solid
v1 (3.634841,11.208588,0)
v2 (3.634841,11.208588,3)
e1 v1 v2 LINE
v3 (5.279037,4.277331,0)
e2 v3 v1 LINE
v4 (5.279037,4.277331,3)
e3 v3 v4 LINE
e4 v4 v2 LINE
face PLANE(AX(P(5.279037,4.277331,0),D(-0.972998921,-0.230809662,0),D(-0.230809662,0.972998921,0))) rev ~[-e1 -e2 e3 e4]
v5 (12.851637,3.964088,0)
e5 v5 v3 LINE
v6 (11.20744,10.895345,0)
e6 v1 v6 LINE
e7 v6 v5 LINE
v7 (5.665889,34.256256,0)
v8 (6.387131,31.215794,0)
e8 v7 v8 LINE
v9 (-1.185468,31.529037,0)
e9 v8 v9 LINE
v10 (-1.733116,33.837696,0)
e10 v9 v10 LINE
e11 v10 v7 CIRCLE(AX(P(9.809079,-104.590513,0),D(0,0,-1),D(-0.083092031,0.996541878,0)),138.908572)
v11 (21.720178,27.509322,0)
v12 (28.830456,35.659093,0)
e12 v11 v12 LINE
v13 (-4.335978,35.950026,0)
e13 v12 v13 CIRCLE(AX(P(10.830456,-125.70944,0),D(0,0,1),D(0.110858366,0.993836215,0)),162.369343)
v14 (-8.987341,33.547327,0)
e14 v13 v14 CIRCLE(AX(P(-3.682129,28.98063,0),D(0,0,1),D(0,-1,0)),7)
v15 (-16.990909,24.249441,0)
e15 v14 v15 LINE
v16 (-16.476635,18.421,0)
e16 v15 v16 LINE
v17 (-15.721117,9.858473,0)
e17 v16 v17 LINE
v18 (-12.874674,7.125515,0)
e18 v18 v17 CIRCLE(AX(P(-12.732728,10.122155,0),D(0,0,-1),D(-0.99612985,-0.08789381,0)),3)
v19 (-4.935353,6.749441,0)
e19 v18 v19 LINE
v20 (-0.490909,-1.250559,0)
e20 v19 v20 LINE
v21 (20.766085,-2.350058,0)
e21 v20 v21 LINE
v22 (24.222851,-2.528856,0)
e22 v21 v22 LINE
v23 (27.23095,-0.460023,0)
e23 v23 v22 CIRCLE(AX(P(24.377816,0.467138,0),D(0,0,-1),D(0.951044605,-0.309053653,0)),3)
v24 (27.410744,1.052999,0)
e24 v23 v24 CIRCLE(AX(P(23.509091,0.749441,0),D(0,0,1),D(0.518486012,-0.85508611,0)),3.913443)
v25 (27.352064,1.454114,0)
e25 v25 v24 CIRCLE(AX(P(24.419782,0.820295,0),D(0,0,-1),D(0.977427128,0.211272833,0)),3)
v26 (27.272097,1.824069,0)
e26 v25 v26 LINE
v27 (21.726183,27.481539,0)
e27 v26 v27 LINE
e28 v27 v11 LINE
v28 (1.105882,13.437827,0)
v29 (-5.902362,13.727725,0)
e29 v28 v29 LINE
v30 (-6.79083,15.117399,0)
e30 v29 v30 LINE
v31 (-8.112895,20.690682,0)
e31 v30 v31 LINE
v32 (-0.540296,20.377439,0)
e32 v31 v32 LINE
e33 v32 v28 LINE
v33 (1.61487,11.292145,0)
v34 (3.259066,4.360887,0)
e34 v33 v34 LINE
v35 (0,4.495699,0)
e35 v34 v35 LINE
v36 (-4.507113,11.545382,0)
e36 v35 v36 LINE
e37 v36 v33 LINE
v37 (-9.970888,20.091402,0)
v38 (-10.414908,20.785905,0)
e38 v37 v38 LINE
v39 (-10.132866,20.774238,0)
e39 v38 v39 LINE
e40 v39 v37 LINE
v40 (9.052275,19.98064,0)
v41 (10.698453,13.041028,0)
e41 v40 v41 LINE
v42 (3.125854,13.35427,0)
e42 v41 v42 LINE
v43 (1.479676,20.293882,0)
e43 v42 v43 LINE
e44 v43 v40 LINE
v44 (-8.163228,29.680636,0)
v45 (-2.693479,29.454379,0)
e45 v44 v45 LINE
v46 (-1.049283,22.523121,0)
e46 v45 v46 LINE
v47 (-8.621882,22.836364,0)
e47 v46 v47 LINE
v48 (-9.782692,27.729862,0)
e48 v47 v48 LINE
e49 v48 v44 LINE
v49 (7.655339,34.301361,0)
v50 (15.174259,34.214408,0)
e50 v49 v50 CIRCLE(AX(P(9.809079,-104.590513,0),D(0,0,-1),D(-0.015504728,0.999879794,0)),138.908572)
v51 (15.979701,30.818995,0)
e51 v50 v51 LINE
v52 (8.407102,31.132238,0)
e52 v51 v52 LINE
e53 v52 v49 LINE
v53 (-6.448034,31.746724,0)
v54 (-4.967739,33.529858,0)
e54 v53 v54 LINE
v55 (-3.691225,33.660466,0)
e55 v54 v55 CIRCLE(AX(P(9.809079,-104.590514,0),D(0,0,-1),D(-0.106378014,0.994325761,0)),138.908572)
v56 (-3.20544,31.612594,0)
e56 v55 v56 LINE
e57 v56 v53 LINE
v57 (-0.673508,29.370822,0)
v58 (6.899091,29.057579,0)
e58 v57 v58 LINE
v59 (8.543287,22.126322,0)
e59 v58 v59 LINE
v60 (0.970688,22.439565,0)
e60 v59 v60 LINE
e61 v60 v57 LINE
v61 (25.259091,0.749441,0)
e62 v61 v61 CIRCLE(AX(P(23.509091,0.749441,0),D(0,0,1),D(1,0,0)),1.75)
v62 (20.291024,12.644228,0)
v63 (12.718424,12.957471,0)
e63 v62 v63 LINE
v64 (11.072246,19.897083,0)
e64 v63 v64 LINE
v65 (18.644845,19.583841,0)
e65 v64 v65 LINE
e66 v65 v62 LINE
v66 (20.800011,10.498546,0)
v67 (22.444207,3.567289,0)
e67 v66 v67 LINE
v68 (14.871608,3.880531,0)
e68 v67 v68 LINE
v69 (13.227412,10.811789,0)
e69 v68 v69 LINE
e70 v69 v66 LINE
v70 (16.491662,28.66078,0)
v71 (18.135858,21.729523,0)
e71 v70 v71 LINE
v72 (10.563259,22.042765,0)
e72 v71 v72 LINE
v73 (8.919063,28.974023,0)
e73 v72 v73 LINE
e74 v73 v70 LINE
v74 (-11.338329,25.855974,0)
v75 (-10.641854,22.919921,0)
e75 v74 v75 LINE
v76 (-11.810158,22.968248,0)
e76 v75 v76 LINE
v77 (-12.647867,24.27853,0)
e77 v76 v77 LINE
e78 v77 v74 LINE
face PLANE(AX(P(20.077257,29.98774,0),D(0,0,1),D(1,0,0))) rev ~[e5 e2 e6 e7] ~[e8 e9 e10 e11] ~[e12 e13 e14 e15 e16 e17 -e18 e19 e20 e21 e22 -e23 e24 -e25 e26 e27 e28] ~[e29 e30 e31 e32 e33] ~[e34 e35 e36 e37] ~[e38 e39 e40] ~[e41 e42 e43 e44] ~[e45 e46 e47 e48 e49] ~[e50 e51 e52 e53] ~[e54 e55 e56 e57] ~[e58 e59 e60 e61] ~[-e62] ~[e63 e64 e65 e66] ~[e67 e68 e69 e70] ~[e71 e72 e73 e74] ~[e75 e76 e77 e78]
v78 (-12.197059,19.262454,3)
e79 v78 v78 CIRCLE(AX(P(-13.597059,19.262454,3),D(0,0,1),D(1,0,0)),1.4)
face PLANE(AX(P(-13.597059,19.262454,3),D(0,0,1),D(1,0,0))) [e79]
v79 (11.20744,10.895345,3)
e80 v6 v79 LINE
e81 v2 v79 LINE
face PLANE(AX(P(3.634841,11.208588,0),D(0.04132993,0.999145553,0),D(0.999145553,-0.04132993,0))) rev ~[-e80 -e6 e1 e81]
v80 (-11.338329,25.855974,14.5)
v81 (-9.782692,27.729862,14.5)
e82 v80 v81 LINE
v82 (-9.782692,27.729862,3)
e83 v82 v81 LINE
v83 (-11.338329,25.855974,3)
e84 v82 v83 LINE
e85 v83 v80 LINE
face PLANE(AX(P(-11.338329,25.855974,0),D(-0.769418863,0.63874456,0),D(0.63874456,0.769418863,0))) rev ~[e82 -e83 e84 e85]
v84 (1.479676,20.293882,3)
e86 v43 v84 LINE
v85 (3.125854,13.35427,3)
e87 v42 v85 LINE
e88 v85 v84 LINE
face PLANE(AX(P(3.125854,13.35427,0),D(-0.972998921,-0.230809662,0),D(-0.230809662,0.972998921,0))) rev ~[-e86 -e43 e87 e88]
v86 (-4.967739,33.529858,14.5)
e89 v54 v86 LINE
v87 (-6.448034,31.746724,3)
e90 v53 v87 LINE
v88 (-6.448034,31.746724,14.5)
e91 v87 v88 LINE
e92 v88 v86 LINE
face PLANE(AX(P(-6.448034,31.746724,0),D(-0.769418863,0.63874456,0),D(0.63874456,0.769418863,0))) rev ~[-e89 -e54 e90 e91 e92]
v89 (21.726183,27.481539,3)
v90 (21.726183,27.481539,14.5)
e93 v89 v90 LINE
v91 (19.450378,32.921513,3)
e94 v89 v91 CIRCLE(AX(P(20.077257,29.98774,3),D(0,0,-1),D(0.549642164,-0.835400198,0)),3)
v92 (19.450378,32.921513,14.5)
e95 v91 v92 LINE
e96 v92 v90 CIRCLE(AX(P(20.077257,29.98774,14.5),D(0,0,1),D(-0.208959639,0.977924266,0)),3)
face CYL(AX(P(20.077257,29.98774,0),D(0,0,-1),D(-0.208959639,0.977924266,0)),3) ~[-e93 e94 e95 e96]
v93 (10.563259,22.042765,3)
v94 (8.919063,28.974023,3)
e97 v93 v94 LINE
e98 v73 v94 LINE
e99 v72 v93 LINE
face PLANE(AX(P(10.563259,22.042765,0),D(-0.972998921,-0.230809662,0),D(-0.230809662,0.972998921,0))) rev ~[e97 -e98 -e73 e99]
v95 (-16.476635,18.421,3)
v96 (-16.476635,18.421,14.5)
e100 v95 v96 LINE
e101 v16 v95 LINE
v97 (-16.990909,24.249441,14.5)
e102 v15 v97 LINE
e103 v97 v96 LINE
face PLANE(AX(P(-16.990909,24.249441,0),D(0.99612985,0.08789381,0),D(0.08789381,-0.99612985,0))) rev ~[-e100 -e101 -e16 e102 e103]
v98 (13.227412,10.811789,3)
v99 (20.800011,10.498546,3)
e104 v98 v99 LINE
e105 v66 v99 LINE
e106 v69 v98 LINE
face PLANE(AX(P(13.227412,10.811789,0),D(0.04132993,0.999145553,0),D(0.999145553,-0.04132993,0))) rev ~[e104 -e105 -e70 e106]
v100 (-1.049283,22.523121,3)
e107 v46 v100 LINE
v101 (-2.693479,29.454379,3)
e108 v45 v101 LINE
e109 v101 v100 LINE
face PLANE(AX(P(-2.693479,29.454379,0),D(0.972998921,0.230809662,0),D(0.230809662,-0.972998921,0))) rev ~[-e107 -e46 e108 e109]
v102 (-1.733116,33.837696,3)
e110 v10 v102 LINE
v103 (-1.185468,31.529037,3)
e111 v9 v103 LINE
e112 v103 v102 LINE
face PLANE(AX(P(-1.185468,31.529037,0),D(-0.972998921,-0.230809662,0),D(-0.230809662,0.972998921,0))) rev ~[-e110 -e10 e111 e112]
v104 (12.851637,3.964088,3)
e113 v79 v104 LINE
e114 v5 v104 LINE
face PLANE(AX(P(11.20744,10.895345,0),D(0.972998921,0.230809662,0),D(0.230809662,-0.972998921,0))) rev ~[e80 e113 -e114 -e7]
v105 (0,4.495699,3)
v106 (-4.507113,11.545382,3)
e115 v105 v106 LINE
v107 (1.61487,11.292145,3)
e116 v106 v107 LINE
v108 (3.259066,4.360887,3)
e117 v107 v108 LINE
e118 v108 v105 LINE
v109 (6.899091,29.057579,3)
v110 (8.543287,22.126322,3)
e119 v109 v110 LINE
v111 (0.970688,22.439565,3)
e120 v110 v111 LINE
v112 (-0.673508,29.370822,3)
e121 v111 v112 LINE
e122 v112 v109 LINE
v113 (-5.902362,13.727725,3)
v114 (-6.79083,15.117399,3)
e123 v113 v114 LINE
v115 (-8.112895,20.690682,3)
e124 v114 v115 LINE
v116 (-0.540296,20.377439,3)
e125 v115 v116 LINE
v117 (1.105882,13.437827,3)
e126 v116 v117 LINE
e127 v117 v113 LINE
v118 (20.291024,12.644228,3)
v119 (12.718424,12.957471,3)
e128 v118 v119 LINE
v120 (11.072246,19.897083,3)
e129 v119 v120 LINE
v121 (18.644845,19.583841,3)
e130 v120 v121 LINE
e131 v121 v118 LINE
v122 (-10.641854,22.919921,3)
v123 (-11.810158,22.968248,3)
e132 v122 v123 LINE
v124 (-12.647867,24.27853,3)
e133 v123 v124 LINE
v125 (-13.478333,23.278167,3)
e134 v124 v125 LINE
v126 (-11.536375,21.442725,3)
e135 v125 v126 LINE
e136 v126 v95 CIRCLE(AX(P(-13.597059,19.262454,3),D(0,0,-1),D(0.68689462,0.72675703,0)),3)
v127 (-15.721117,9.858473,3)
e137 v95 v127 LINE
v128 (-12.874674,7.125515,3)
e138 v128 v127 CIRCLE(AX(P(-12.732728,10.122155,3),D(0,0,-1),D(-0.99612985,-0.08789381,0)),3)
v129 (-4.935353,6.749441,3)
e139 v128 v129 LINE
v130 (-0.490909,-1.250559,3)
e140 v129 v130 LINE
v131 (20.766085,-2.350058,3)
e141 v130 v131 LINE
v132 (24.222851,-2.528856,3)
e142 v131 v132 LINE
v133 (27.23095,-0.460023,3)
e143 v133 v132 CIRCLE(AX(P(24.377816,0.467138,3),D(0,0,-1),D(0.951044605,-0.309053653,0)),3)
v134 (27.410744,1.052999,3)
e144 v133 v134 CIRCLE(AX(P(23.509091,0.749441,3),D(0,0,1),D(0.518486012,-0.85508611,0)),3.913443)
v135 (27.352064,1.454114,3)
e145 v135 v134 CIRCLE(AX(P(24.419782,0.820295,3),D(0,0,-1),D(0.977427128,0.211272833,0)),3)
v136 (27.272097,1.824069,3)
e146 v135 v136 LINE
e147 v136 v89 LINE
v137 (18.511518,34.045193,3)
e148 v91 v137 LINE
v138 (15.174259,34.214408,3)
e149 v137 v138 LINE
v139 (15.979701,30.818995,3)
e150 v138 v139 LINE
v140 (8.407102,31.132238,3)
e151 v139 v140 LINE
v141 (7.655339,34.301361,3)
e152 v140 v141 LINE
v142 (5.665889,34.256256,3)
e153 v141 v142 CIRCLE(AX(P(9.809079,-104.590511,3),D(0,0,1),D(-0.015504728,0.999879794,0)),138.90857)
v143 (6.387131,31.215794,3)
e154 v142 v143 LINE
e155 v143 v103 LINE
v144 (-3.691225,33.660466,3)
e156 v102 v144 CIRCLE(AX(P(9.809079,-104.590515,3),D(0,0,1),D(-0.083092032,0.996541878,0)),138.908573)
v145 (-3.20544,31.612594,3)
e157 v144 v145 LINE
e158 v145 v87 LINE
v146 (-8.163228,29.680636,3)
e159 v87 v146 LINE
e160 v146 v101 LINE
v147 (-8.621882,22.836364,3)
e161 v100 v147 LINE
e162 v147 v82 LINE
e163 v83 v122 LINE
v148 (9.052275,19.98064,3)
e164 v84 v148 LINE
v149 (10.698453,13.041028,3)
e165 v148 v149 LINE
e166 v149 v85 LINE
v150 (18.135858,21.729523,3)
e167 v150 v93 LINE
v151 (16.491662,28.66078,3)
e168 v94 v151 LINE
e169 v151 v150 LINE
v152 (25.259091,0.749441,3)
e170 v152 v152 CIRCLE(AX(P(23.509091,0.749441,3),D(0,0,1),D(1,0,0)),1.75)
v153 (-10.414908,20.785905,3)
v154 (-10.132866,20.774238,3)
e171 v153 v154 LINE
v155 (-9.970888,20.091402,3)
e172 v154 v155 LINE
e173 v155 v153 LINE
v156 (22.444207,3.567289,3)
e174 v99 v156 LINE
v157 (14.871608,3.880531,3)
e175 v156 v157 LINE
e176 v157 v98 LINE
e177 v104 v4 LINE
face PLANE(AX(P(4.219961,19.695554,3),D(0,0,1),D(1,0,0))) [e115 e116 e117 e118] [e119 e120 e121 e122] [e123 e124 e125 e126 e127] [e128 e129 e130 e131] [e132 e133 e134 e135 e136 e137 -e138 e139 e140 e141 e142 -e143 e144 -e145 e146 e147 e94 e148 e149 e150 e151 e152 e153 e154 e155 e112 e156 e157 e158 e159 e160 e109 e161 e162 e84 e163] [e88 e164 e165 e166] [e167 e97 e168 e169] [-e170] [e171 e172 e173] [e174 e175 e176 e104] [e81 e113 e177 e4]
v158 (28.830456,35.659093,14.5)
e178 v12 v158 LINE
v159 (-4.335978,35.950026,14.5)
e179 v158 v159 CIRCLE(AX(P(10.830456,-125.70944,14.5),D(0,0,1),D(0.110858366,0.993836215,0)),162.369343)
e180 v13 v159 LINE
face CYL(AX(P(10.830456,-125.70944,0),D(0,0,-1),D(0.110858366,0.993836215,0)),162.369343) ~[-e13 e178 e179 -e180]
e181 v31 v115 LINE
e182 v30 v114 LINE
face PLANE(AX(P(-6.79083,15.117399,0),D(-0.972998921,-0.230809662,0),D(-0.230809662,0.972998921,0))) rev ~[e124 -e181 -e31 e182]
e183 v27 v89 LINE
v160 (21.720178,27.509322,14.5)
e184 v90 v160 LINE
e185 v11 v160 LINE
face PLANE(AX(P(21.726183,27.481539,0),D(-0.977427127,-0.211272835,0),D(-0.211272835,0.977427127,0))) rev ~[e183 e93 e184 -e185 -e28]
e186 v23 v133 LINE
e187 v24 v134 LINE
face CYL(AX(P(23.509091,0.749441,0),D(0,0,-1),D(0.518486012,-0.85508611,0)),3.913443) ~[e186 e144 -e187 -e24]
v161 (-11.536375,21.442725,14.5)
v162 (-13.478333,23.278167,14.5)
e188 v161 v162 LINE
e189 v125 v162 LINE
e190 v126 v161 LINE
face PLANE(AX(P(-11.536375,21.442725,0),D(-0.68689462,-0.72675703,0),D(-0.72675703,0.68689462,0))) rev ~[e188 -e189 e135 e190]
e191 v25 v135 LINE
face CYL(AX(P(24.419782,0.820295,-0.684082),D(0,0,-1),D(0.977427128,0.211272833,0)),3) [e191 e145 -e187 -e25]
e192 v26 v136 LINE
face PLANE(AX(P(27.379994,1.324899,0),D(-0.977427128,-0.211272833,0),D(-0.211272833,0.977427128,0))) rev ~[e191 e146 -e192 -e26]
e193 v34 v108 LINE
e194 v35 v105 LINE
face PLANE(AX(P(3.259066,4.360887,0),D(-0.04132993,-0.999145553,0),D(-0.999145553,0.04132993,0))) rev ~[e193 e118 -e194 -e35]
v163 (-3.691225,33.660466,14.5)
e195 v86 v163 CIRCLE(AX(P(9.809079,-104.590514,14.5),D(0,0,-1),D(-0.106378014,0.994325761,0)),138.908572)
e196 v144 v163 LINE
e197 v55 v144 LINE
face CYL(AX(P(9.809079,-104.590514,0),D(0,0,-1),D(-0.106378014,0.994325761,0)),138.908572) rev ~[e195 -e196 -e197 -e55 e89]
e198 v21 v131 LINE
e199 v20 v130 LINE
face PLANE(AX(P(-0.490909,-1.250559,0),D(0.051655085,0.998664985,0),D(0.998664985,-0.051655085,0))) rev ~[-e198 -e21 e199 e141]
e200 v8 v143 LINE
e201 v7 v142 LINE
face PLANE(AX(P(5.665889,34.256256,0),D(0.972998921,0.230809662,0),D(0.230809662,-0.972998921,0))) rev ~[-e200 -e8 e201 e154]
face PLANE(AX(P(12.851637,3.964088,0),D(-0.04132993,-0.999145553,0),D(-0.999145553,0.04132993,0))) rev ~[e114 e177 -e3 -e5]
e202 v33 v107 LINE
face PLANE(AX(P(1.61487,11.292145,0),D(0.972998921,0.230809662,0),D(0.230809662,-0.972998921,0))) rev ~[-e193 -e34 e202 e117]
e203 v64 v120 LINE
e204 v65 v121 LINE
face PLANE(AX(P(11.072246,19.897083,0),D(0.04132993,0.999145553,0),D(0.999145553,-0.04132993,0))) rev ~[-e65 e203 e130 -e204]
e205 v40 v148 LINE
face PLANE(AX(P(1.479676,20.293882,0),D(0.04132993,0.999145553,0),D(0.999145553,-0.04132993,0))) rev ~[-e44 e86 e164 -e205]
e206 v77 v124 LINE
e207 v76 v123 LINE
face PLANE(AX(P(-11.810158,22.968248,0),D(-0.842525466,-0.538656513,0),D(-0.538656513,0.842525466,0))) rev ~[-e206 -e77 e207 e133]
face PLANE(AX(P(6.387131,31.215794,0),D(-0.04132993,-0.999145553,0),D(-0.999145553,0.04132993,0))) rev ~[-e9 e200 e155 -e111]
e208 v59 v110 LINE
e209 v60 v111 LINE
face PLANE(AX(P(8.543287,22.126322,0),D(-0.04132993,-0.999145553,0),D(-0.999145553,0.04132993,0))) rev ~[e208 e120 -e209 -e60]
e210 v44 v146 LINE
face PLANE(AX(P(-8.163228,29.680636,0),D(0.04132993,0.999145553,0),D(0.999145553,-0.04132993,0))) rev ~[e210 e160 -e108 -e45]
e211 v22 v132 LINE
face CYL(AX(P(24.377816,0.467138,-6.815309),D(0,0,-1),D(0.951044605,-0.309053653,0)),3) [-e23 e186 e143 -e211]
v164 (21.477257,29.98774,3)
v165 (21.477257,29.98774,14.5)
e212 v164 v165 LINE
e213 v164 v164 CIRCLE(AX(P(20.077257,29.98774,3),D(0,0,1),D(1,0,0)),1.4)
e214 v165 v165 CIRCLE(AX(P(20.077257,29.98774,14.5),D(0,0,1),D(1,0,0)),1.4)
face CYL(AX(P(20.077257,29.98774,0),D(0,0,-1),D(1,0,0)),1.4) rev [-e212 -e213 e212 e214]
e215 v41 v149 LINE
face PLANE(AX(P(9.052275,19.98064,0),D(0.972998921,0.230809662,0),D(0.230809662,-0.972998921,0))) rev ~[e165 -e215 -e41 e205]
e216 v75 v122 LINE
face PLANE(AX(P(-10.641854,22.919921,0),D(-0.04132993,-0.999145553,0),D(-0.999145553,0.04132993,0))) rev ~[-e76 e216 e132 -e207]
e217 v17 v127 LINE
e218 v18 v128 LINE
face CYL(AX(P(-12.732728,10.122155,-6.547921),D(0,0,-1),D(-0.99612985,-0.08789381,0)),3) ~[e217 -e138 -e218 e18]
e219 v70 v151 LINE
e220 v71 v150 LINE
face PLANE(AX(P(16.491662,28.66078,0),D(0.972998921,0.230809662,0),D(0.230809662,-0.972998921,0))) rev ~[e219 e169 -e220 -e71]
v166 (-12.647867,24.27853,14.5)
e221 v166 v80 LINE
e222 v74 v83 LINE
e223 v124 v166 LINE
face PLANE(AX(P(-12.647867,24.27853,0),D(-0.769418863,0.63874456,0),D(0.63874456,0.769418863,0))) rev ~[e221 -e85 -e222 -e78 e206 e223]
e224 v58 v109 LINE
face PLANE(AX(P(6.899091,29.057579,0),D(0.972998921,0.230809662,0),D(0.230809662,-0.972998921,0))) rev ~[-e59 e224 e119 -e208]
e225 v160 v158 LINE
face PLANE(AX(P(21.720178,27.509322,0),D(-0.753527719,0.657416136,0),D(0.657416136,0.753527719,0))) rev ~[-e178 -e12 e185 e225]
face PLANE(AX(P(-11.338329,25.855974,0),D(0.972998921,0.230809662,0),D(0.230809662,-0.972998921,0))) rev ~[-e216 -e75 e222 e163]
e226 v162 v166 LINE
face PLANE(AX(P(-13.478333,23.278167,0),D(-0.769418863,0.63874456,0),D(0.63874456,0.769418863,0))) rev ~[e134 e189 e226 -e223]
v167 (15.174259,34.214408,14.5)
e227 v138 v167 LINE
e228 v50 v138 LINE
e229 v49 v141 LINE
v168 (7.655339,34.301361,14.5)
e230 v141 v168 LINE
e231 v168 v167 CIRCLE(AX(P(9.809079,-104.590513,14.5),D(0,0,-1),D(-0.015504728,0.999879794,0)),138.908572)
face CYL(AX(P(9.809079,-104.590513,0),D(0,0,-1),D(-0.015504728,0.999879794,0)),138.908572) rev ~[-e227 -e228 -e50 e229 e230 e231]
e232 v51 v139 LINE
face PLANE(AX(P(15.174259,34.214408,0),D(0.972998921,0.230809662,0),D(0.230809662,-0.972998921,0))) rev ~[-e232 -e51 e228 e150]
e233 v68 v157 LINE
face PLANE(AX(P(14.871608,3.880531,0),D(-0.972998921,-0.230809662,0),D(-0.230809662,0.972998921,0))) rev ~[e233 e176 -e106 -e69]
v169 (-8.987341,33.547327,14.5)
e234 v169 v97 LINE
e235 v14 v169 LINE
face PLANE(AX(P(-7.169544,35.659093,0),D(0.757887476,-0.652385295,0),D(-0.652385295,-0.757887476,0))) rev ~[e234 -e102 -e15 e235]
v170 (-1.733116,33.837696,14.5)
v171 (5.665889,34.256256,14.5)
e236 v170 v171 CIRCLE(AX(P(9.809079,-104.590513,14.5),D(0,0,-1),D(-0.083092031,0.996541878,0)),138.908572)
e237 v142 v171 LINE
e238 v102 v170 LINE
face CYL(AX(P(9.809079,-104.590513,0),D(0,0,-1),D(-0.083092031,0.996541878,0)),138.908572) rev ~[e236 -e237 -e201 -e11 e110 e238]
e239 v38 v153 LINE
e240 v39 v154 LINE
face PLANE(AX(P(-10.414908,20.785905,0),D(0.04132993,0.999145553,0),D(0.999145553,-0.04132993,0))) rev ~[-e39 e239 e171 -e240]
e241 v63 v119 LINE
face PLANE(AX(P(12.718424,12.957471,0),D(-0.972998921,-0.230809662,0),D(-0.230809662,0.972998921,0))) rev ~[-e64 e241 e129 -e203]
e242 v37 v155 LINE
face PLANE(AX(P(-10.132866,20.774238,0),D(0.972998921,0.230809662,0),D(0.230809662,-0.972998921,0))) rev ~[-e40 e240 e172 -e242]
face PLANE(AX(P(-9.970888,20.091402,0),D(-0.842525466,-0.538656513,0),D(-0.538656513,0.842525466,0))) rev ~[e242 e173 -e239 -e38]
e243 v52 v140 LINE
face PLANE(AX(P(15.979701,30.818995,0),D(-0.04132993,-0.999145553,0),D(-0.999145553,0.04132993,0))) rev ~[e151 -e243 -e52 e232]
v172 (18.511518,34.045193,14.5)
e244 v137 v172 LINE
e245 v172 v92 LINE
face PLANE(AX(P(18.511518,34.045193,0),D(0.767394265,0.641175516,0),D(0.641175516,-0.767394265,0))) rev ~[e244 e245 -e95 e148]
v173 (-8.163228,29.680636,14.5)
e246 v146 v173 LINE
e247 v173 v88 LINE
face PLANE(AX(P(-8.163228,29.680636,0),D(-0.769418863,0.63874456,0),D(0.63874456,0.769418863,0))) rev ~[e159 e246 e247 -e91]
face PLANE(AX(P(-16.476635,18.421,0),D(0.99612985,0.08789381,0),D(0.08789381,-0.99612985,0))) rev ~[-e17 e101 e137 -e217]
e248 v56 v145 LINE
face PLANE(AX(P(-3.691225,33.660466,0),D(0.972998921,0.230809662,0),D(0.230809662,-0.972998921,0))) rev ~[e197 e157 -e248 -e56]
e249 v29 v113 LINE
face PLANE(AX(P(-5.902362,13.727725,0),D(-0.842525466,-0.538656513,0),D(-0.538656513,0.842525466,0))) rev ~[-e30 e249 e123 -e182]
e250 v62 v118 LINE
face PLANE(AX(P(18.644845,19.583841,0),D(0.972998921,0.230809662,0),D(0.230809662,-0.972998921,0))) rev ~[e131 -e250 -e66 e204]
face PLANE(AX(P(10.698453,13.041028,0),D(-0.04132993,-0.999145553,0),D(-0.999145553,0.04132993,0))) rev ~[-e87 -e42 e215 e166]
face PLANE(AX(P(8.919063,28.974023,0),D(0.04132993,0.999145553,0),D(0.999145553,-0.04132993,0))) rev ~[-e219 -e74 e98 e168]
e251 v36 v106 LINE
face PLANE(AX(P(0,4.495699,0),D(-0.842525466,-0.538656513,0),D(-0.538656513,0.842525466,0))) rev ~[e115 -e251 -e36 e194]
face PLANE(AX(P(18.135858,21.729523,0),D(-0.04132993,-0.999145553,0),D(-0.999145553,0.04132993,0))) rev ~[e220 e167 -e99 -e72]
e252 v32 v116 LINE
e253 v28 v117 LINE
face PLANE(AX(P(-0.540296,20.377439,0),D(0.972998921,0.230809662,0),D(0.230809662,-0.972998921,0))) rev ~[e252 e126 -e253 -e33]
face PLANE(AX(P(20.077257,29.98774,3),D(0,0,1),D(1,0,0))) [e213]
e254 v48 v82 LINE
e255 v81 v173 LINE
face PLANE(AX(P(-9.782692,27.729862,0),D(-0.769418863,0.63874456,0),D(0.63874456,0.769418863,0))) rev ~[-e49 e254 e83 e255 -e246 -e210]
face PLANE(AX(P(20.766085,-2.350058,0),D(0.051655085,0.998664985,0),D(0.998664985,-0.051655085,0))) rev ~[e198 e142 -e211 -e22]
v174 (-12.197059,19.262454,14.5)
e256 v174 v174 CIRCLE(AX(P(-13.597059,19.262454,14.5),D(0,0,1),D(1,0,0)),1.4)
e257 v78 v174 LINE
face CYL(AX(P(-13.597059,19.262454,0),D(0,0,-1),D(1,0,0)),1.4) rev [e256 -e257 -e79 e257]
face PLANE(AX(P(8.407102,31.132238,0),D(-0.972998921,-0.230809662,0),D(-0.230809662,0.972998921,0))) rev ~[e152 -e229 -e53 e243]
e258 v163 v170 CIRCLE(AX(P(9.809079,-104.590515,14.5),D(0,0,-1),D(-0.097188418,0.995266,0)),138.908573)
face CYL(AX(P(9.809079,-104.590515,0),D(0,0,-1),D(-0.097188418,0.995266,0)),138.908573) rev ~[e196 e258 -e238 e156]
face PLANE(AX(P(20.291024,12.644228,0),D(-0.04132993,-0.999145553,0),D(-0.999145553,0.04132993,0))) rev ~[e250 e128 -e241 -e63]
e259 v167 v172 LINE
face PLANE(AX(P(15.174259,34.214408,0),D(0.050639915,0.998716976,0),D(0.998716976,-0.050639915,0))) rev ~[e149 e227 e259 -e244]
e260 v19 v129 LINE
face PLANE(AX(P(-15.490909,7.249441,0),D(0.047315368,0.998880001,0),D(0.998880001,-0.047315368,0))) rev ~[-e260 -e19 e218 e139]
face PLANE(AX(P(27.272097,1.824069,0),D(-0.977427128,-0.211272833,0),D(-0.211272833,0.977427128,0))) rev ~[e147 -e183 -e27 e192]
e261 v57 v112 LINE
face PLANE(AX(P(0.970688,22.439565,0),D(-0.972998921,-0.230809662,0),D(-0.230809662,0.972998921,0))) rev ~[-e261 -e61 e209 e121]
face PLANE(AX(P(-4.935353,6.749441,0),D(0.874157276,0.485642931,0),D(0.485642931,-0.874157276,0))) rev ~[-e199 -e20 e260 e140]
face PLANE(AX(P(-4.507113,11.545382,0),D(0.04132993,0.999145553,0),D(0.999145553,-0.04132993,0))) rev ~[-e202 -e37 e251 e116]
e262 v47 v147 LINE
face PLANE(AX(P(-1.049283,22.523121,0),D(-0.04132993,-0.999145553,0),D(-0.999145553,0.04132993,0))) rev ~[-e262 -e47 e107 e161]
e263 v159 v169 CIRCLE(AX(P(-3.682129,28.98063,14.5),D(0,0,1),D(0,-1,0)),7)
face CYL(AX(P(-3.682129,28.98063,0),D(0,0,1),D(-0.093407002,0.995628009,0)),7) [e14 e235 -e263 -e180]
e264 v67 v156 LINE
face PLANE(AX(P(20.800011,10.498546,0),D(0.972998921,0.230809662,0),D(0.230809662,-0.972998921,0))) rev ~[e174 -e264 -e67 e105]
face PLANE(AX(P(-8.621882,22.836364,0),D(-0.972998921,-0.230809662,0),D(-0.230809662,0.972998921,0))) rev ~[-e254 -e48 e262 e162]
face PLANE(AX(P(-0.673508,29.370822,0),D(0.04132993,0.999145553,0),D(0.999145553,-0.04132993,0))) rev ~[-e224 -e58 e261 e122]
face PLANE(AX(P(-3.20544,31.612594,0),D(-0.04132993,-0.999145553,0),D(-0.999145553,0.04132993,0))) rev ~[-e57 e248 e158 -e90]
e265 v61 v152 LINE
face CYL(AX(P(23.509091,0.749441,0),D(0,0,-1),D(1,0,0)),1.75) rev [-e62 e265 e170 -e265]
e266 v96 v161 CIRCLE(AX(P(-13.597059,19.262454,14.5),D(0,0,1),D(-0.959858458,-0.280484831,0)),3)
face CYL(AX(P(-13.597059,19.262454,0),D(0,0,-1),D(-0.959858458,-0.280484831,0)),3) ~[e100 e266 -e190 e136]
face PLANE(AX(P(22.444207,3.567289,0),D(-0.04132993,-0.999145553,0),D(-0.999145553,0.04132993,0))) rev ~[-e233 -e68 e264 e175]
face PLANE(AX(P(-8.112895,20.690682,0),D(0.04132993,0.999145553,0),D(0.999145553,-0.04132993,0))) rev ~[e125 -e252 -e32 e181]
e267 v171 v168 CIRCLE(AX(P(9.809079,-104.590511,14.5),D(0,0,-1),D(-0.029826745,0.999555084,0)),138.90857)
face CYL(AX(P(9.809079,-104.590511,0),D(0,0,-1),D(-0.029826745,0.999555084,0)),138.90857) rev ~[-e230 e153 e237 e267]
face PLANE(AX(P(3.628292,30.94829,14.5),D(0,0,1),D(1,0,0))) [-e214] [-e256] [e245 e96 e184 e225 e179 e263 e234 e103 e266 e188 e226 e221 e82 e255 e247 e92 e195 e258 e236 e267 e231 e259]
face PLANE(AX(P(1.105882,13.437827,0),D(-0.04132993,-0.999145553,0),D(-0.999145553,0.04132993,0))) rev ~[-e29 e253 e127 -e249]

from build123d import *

# Parameters (mm, degrees)
F0_R        = 1.75
F1_DEPTH    = 3
F0_R_2      = 1.4
F2_DEPTH    = 14.5
F3_DEPTH    = 3
F4_R        = 7
F5_T1_DEPTH = 16.6306186867
F5_T3_DEPTH = 4.3681636199
F5_T5_DEPTH = 16.0958411758
F7_DEPTH    = 3


# Not quite as in the source:
# - a fillet or chamfer that OpenCascade refuses, or shapes differently, is made with other operations: its cross-section is extruded or revolved along the edge and cut away or added
# - two fillets or chamfers of one size are made in one step


with BuildPart() as f1:
    # F0 (on Top) → F1 (new body)
    with BuildSketch(Plane.XY):
        with BuildLine():
            Line((-0.4909088138, -1.2505585665), (20.7660850672, -2.35005825))
            Line((20.7660850672, -2.35005825), (25.5381567791, -2.5968895454))
            ThreePointArc((25.5381567791, -2.5968895454), (27.0513379129, -0.9141469555), (27.3799938245, 1.3248986134))
            Line((27.3799938245, 1.3248986134), (27.2720971653, 1.8240689049))
            Line((27.2720971653, 1.8240689049), (21.7261834625, 27.4815394929))
            ThreePointArc((21.7261834625, 27.4815394929), (17.3096816882, 28.8299287619), (19.4503780507, 32.9215128838))
            Line((19.4503780507, 32.9215128838), (18.5115177807, 34.0451927012))
            Line((18.5115177807, 34.0451927012), (15.1742594532, 34.2144082882))
            Line((15.1742594532, 34.2144082882), (15.9797014768, 30.8189948872))
            Line((15.9797014768, 30.8189948872), (16.4916617939, 28.6607800556))
            Line((16.4916617939, 28.6607800556), (18.135858017, 21.7295227758))
            Line((18.135858017, 21.7295227758), (18.644845427, 19.5838405017))
            Line((18.644845427, 19.5838405017), (20.2910235881, 12.6442281836))
            Line((20.2910235881, 12.6442281836), (20.8000109982, 10.4985459094))
            Line((20.8000109982, 10.4985459094), (22.4442072213, 3.5672886297))
            Line((22.4442072213, 3.5672886297), (14.8716080252, 3.8805312748))
            Line((14.8716080252, 3.8805312748), (12.8516365903, 3.9640879479))
            Line((12.8516365903, 3.9640879479), (5.2790373942, 4.2773305929))
            Line((5.2790373942, 4.2773305929), (3.2590659592, 4.360887266))
            Line((3.2590659592, 4.360887266), (0, 4.4956994243))
            Line((0, 4.4956994243), (-4.5071129665, 11.5453820412))
            Line((-4.5071129665, 11.5453820412), (-5.9023623433, 13.727724785))
            Line((-5.9023623433, 13.727724785), (-6.7908302355, 15.1173985523))
            Line((-6.7908302355, 15.1173985523), (-9.9708875905, 20.0914019161))
            Line((-9.9708875905, 20.0914019161), (-10.4149082493, 20.7859051919))
            Line((-10.4149082493, 20.7859051919), (-11.8101576261, 22.9682479357))
            Line((-11.8101576261, 22.9682479357), (-12.6478674294, 24.2785297685))
            Line((-12.6478674294, 24.2785297685), (-13.4783331305, 23.2781674713))
            Line((-13.4783331305, 23.2781674713), (-11.5363753254, 21.4427254814))
            ThreePointArc((-11.5363753254, 21.4427254814), (-12.0316990994, 16.7032264224), (-16.4766345607, 18.4209998989))
            Line((-16.4766345607, 18.4209998989), (-15.4909088138, 7.2494414335))
            Line((-15.4909088138, 7.2494414335), (-4.9353532582, 6.7494414335))
            Line((-4.9353532582, 6.7494414335), (-0.4909088138, -1.2505585665))
        make_face()
        with Locations((23.5090911862, 0.7494414335)):
            Circle(F0_R, mode=Mode.SUBTRACT)
    extrude(amount=F1_DEPTH)

    # F0 (on Top) → F2 (join)
    with BuildSketch(Plane.XY):
        with BuildLine():
            Line((-16.9909088138, 24.2494414335), (-16.4766345607, 18.4209998989))
            ThreePointArc((-16.4766345607, 18.4209998989), (-12.0316990994, 16.7032264224), (-11.5363753254, 21.4427254814))
            Line((-11.5363753254, 21.4427254814), (-13.4783331305, 23.2781674713))
            Line((-13.4783331305, 23.2781674713), (-12.6478674294, 24.2785297685))
            Line((-12.6478674294, 24.2785297685), (-11.3383288336, 25.8559736489))
            Line((-11.3383288336, 25.8559736489), (-9.782692223, 27.729862253))
            Line((-9.782692223, 27.729862253), (-8.1632279798, 29.680636341))
            Line((-8.1632279798, 29.680636341), (-6.4480341787, 31.746724331))
            Line((-6.4480341787, 31.746724331), (-4.9677388347, 33.5298583591))
            ThreePointArc((-4.9677388347, 33.5298583591), (-4.3296328325, 33.596636032), (-3.691225205, 33.6604657178))
            ThreePointArc((-3.691225205, 33.6604657178), (-2.7124843131, 33.7525453098), (-1.7331162834, 33.8376960422))
            ThreePointArc((-1.7331162834, 33.8376960422), (1.9635943301, 34.0963274062), (5.6658885292, 34.2562561568))
            ThreePointArc((5.6658885292, 34.2562561568), (6.6605332405, 34.2823712951), (7.6553394943, 34.3013612736))
            ThreePointArc((7.6553394943, 34.3013612736), (11.4153879508, 34.3087710358), (15.1742594532, 34.2144082882))
            Line((15.1742594532, 34.2144082882), (18.5115177807, 34.0451927012))
            Line((18.5115177807, 34.0451927012), (19.4503780507, 32.9215128838))
            ThreePointArc((19.4503780507, 32.9215128838), (17.3096816882, 28.8299287619), (21.7261834625, 27.4815394929))
            Line((21.7261834625, 27.4815394929), (21.7201782041, 27.5093220636))
            Line((21.7201782041, 27.5093220636), (28.8304557098, 35.6590934098))
            ThreePointArc((28.8304557098, 35.6590934098), (10.8304557098, 36.6599030898), (-7.1695442902, 35.6590934098))
            Line((-7.1695442902, 35.6590934098), (-16.9909088138, 24.2494414335))
        make_face()
        with Locations((-13.5970591864, 19.2624543916)):
            Circle(F0_R_2, mode=Mode.SUBTRACT)
        with Locations((20.077256969, 29.9877400872)):
            Circle(F0_R_2, mode=Mode.SUBTRACT)
    extrude(amount=F2_DEPTH)

    # F0 (on Top) → F3 (join)
    with BuildSketch(Plane.XY):
        with BuildLine():
            Line((-9.782692223, 27.729862253), (-11.3383288336, 25.8559736489))
            Line((-11.3383288336, 25.8559736489), (-10.6418538761, 22.9199207303))
            Line((-10.6418538761, 22.9199207303), (-11.8101576261, 22.9682479357))
            Line((-11.8101576261, 22.9682479357), (-10.4149082493, 20.7859051919))
            Line((-10.4149082493, 20.7859051919), (-10.132866466, 20.7742384561))
            Line((-10.132866466, 20.7742384561), (-9.9708875905, 20.0914019161))
            Line((-9.9708875905, 20.0914019161), (-6.7908302355, 15.1173985523))
            Line((-6.7908302355, 15.1173985523), (-8.112895031, 20.690681783))
            Line((-8.112895031, 20.690681783), (-0.540295835, 20.3774391379))
            Line((-0.540295835, 20.377439138), (1.1058823261, 13.4378268199))
            Line((1.1058823261, 13.4378268199), (-5.9023623433, 13.727724785))
            Line((-5.9023623433, 13.727724785), (-4.5071129665, 11.5453820412))
            Line((-4.5071129665, 11.5453820412), (1.6148697362, 11.2921445457))
            Line((1.6148697362, 11.2921445457), (3.2590659592, 4.360887266))
            Line((3.2590659592, 4.360887266), (5.2790373942, 4.2773305929))
            Line((5.2790373942, 4.2773305929), (3.6348411711, 11.2085878727))
            Line((3.6348411711, 11.2085878727), (11.2074403672, 10.8953452276))
            Line((11.2074403672, 10.8953452276), (12.8516365903, 3.9640879479))
            Line((12.8516365903, 3.9640879479), (14.8716080252, 3.8805312748))
            Line((14.8716080252, 3.8805312748), (13.2274118021, 10.8117885545))
            Line((13.2274118021, 10.8117885545), (20.8000109982, 10.4985459094))
            Line((20.8000109982, 10.4985459094), (20.2910235881, 12.6442281836))
            Line((20.2910235881, 12.6442281836), (12.7184243921, 12.9574708287))
            Line((12.7184243921, 12.9574708287), (11.072246231, 19.8970831467))
            Line((11.072246231, 19.8970831467), (18.644845427, 19.5838405017))
            Line((18.644845427, 19.5838405017), (18.135858017, 21.7295227758))
            Line((18.135858017, 21.7295227758), (10.5632588209, 22.0427654209))
            Line((10.5632588209, 22.0427654209), (8.9190625979, 28.9740227006))
            Line((8.9190625979, 28.9740227006), (16.4916617939, 28.6607800556))
            Line((16.4916617939, 28.6607800556), (15.9797014768, 30.8189948872))
            Line((15.9797014768, 30.8189948872), (8.4071022808, 31.1322375323))
            Line((8.4071022808, 31.1322375323), (7.6553394943, 34.3013612736))
            ThreePointArc((7.6553394943, 34.3013612736), (6.6605332405, 34.2823712951), (5.6658885292, 34.2562561568))
            Line((5.6658885292, 34.2562561568), (6.3871308458, 31.2157942054))
            Line((6.3871308458, 31.2157942054), (-1.1854683502, 31.5290368504))
            Line((-1.1854683502, 31.5290368504), (-1.7331162834, 33.8376960422))
            ThreePointArc((-1.7331162834, 33.8376960422), (-2.7124843131, 33.7525453098), (-3.691225205, 33.6604657178))
            Line((-3.691225205, 33.6604657178), (-3.2054397853, 31.6125935235))
            Line((-3.2054397853, 31.6125935235), (-6.4480341787, 31.746724331))
            Line((-6.4480341787, 31.746724331), (-8.1632279798, 29.680636341))
            Line((-8.1632279798, 29.680636341), (-2.6934794682, 29.4543786918))
            Line((-2.6934794682, 29.4543786918), (-1.0492832451, 22.5231214121))
            Line((-1.0492832451, 22.5231214121), (-8.6218824411, 22.8363640572))
            Line((-8.6218824411, 22.8363640572), (-9.782692223, 27.729862253))
        make_face()
        Polygon((1.4796756, 20.2938824649), (9.052274796, 19.9806398198), (10.6984529571, 13.0410275017), (3.1258537611, 13.3542701468), align=None, mode=Mode.SUBTRACT)
        Polygon((8.543287386, 22.126322094), (0.9706881899, 22.439564739), (-0.6735080331, 29.3708220188), (6.8990911629, 29.0575793737), align=None, mode=Mode.SUBTRACT)
    extrude(amount=F3_DEPTH)

    # F4
    f4_edges = [f1.edges().sort_by_distance(p)[0] for p in [
        (-7.169544, 35.659093, 7.25),
    ]]
    fillet(f4_edges, radius=F4_R)

    # F5: fillet of radius 3 on 3 edges, made by hand

    # F5_s2 → F5_t1 (cut)
    with BuildSketch(Plane.XY.offset(-6.8153093434)):
        with BuildLine():
            ThreePointArc((27.2309502901, -0.4600225022), (26.0778302758, -2.0046934728), (24.2228512202, -2.5288564993))
            Line((24.2228512202, -2.5288564993), (25.5381567791, -2.5968895454))
            ThreePointArc((25.5381567791, -2.5968895454), (26.5766364437, -1.6806211776), (27.2309502901, -0.4600225022))
        make_face()
    extrude(amount=F5_T1_DEPTH, mode=Mode.SUBTRACT)

    # F5_s4 → F5_t3 (cut)
    with BuildSketch(Plane.XY.offset(-0.6840818099)):
        with BuildLine():
            ThreePointArc((27.3520636944, 1.4541138391), (27.3881865873, 1.2545487843), (27.4107435182, 1.0529991394))
            ThreePointArc((27.4107435182, 1.0529991394), (27.3977458408, 1.1892177156), (27.3799938245, 1.3248986134))
            Line((27.3799938245, 1.3248986134), (27.3520636944, 1.4541138391))
        make_face()
    extrude(amount=F5_T3_DEPTH, mode=Mode.SUBTRACT)

    # F5_s6 → F5_t5 (cut)
    with BuildSketch(Plane.XY.offset(-6.5479205879)):
        with BuildLine():
            ThreePointArc((-15.7211174898, 9.8584730948), (-14.8104709381, 7.9581341855), (-12.8746740451, 7.1255145234))
            Line((-12.8746740451, 7.1255145234), (-15.4909088138, 7.2494414335))
            Line((-15.4909088138, 7.2494414335), (-15.7211174898, 9.8584730948))
        make_face()
    extrude(amount=F5_T5_DEPTH, mode=Mode.SUBTRACT)

    # F0 (on Top) → F7 (join)
    with BuildSketch(Plane.XY):
        with Locations((20.077256969, 29.9877400872)):
            Circle(F0_R_2)
        with Locations((-13.5970591864, 19.2624543916)):
            Circle(F0_R_2)
    extrude(amount=F7_DEPTH)


solid = f1.part
